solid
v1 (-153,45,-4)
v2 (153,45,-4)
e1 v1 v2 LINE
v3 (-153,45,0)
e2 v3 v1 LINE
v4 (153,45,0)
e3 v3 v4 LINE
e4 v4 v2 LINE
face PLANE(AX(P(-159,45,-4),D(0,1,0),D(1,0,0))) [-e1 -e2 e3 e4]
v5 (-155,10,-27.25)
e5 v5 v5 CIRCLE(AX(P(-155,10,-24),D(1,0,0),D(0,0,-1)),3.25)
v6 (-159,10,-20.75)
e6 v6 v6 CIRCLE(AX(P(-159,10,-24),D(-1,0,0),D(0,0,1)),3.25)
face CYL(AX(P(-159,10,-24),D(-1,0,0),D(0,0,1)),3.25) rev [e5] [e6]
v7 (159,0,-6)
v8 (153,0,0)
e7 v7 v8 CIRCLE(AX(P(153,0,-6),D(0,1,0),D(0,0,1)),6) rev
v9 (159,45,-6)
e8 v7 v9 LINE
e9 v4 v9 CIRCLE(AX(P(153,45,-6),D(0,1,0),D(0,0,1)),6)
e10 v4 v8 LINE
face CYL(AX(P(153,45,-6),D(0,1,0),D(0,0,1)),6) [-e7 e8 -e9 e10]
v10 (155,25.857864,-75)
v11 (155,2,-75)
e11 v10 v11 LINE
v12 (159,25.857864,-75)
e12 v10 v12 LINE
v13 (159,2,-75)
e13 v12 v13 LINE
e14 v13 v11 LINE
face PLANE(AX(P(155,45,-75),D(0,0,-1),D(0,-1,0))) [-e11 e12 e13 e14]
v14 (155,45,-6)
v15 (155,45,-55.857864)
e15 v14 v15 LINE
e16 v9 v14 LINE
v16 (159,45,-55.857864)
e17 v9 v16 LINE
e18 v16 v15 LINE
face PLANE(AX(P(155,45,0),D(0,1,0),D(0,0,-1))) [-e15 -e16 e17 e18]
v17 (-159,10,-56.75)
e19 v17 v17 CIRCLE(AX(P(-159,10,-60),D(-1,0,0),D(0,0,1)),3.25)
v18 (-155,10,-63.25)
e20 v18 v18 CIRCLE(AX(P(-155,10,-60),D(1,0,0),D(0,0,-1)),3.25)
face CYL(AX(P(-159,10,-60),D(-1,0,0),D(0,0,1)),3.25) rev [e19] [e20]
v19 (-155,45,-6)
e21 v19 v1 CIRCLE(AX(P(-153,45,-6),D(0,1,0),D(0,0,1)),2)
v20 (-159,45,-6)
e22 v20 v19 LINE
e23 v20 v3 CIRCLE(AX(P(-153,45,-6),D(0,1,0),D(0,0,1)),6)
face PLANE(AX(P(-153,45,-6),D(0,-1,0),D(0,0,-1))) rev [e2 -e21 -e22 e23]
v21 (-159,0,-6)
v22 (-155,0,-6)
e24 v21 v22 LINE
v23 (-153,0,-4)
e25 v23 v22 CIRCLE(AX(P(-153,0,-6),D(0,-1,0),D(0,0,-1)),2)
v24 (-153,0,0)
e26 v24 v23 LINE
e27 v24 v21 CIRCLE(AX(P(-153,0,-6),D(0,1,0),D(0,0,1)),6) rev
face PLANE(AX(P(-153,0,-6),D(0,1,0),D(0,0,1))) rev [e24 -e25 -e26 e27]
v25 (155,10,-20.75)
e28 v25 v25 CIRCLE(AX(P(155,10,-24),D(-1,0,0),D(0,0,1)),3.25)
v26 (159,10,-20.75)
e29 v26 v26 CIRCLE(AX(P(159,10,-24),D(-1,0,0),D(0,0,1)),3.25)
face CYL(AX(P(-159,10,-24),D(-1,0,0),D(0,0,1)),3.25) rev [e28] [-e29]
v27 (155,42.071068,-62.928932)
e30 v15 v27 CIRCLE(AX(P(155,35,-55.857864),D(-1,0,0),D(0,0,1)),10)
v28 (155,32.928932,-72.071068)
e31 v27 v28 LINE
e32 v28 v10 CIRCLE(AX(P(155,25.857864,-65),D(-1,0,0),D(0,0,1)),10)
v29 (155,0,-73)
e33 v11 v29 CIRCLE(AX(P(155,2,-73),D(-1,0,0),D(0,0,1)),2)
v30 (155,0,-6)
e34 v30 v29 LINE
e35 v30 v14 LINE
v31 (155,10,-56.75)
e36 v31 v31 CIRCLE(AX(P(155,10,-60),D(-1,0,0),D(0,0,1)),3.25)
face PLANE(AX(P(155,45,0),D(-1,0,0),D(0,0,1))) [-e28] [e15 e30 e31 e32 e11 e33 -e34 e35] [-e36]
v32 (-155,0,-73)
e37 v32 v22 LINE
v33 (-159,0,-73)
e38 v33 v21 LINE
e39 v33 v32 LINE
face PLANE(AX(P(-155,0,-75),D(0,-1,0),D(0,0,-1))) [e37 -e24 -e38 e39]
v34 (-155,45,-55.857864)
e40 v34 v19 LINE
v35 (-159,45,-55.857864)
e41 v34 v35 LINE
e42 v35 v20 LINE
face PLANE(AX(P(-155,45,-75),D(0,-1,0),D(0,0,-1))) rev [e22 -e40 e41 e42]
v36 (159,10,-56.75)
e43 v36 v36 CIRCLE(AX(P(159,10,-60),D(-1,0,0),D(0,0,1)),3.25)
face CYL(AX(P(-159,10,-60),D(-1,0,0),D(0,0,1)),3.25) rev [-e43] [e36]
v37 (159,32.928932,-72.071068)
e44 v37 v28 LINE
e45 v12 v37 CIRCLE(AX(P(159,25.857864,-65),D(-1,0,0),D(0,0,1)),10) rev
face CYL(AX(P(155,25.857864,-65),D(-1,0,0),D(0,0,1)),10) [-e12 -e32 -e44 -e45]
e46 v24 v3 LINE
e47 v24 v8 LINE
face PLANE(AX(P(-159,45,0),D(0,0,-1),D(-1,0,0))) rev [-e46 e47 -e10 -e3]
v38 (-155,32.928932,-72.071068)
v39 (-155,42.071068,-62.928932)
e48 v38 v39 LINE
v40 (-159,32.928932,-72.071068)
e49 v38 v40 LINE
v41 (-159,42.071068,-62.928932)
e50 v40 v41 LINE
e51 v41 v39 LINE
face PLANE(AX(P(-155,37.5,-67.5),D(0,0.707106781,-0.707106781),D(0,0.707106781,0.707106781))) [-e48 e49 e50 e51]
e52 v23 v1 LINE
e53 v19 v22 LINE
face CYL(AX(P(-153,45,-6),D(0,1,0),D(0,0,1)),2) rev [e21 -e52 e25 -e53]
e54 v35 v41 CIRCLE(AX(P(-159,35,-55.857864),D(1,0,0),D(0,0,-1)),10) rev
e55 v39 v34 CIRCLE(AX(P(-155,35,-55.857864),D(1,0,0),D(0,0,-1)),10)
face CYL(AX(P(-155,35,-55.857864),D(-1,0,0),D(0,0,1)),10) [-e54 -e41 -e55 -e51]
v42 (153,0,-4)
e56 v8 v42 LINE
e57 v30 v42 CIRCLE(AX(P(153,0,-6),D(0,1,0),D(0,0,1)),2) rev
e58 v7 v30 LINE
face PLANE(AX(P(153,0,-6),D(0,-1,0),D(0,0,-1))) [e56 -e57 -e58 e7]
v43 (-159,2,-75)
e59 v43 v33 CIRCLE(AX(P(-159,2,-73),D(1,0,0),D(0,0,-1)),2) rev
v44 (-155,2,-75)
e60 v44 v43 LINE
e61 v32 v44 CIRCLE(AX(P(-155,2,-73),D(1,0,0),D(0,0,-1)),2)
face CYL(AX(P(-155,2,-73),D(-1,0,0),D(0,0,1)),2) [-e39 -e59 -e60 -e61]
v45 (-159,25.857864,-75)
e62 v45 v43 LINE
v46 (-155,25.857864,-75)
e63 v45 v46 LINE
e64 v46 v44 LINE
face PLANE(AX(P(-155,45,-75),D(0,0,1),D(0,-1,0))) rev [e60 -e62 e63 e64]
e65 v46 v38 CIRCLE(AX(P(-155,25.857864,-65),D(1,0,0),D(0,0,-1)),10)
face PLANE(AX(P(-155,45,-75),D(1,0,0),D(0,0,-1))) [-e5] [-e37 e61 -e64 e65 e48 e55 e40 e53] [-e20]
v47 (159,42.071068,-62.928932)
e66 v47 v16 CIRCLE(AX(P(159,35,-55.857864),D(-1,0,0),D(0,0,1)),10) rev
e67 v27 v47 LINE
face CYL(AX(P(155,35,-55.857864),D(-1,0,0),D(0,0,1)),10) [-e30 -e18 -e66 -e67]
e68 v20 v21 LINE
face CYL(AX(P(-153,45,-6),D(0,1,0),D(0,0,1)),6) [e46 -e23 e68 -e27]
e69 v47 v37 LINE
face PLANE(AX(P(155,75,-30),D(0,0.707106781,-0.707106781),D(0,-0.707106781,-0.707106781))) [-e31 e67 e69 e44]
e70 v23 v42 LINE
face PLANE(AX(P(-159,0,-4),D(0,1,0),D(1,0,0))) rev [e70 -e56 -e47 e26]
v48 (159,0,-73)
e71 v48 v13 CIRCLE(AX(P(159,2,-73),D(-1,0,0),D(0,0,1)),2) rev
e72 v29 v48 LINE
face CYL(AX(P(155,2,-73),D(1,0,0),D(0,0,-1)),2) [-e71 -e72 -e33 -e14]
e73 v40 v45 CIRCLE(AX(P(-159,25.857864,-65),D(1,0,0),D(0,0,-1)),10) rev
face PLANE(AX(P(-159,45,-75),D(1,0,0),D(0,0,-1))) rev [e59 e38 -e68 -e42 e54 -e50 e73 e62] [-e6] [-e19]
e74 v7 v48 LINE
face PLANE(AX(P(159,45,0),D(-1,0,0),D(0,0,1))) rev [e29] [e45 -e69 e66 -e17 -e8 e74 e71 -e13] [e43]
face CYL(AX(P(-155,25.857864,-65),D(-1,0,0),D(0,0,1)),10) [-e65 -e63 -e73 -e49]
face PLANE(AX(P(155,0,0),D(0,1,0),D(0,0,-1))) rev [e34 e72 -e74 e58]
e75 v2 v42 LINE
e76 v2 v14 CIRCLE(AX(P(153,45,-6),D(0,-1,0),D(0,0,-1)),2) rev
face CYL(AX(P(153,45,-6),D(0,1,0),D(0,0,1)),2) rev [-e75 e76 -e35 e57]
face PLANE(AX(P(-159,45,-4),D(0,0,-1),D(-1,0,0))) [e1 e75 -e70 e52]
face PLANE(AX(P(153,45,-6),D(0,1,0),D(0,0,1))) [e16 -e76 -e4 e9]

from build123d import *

# Parameters (mm, degrees)
EXTRUDE_THIN1_DEPTH        = 45
CHAMFER1_SIZE              = 15
CONVERT_SOLID1_DEPTH       = 45
CONVERT_SOLID1_2_DEPTH     = 45
FILLET1_R                  = 2
FILLET2_R                  = 10
F_6_5_6_5_DIAMETER_HOLE1_D = 6.5
F_6_5_6_5_DIAMETER_HOLE2_D = 6.5


# Read off the part's stored shape, not the designer's step: Convert-Solid1
with BuildPart() as part:
    # Sketch1 → Extrude-Thin1 (new body)
    with BuildSketch(Plane(origin=(0, 0, 0), x_dir=(1, 0, 0), z_dir=(0, 1, 0))):
        Polygon((-159, 75), (-159, 0), (159, 0), (159, 75), (155, 75), (155, 4), (-155, 4), (-155, 75), align=None)
    extrude(amount=EXTRUDE_THIN1_DEPTH)

    # Chamfer1
    chamfer1_edges = [part.edges().sort_by_distance(p)[0] for p in [
        (-157, 45, -75),
        (157, 45, -75),
    ]]
    chamfer(chamfer1_edges, length=CHAMFER1_SIZE)

    # Convert-Solid1 outline → Convert-Solid1 (cut)
    with BuildSketch(Plane(origin=(0, 0, 0), x_dir=(1, 0, 0), z_dir=(0, 1, 0))):
        with BuildLine():
            Line((-159, 0), (-153, 0))
            ThreePointArc((-153, 0), (-157.242640687, 1.757359313), (-159, 6))
            Line((-159, 6), (-159, 0))
        make_face()
        with BuildLine():
            ThreePointArc((159, 6), (157.242640687, 1.757359313), (153, 0))
            Line((153, 0), (159, 0))
            Line((159, 0), (159, 6))
        make_face()
    extrude(amount=CONVERT_SOLID1_DEPTH, mode=Mode.SUBTRACT)

    # Convert-Solid1 2 outline → Convert-Solid1 2 (add)
    with BuildSketch(Plane(origin=(0, 0, 0), x_dir=(1, 0, 0), z_dir=(0, 1, 0))):
        with BuildLine():
            Line((-155, 4), (-153, 4))
            ThreePointArc((-153, 4), (-154.414213562, 4.585786438), (-155, 6))
            Line((-155, 6), (-155, 4))
        make_face()
        with BuildLine():
            ThreePointArc((155, 6), (154.414213562, 4.585786438), (153, 4))
            Line((153, 4), (155, 4))
            Line((155, 4), (155, 6))
        make_face()
    extrude(amount=CONVERT_SOLID1_2_DEPTH)

    # Fillet1
    fillet1_edges = [part.edges().sort_by_distance(p)[0] for p in [
        (157, 0, -75),
        (-157, 0, -75),
    ]]
    fillet(fillet1_edges, radius=FILLET1_R)

    # Fillet2
    fillet2_edges = [part.edges().sort_by_distance(p)[0] for p in [
        (157, 30, -75),
        (157, 45, -60),
        (-157, 45, -60),
        (-157, 30, -75),
    ]]
    fillet(fillet2_edges, radius=FILLET2_R)

    # Ø6.5 (6.5) Diameter Hole1 (through all)
    with Locations(Plane(origin=(-159, 22, -202.5), x_dir=(0, 0, 1), z_dir=(-1, 0, 0))):
        with Locations((-178.5, -12), (-142.5, -12), (142.5, -12), (178.5, -12)):
            Hole(F_6_5_6_5_DIAMETER_HOLE1_D / 2)

    # Ø6.5 (6.5) Diameter Hole2 (through all)
    with Locations(Plane(origin=(159, 22, -202.5), x_dir=(0, 0, -1), z_dir=(1, 0, 0))):
        with Locations((-178.5, -12), (-142.5, -12), (142.5, -12), (178.5, -12)):
            Hole(F_6_5_6_5_DIAMETER_HOLE2_D / 2)


solid = part.part
